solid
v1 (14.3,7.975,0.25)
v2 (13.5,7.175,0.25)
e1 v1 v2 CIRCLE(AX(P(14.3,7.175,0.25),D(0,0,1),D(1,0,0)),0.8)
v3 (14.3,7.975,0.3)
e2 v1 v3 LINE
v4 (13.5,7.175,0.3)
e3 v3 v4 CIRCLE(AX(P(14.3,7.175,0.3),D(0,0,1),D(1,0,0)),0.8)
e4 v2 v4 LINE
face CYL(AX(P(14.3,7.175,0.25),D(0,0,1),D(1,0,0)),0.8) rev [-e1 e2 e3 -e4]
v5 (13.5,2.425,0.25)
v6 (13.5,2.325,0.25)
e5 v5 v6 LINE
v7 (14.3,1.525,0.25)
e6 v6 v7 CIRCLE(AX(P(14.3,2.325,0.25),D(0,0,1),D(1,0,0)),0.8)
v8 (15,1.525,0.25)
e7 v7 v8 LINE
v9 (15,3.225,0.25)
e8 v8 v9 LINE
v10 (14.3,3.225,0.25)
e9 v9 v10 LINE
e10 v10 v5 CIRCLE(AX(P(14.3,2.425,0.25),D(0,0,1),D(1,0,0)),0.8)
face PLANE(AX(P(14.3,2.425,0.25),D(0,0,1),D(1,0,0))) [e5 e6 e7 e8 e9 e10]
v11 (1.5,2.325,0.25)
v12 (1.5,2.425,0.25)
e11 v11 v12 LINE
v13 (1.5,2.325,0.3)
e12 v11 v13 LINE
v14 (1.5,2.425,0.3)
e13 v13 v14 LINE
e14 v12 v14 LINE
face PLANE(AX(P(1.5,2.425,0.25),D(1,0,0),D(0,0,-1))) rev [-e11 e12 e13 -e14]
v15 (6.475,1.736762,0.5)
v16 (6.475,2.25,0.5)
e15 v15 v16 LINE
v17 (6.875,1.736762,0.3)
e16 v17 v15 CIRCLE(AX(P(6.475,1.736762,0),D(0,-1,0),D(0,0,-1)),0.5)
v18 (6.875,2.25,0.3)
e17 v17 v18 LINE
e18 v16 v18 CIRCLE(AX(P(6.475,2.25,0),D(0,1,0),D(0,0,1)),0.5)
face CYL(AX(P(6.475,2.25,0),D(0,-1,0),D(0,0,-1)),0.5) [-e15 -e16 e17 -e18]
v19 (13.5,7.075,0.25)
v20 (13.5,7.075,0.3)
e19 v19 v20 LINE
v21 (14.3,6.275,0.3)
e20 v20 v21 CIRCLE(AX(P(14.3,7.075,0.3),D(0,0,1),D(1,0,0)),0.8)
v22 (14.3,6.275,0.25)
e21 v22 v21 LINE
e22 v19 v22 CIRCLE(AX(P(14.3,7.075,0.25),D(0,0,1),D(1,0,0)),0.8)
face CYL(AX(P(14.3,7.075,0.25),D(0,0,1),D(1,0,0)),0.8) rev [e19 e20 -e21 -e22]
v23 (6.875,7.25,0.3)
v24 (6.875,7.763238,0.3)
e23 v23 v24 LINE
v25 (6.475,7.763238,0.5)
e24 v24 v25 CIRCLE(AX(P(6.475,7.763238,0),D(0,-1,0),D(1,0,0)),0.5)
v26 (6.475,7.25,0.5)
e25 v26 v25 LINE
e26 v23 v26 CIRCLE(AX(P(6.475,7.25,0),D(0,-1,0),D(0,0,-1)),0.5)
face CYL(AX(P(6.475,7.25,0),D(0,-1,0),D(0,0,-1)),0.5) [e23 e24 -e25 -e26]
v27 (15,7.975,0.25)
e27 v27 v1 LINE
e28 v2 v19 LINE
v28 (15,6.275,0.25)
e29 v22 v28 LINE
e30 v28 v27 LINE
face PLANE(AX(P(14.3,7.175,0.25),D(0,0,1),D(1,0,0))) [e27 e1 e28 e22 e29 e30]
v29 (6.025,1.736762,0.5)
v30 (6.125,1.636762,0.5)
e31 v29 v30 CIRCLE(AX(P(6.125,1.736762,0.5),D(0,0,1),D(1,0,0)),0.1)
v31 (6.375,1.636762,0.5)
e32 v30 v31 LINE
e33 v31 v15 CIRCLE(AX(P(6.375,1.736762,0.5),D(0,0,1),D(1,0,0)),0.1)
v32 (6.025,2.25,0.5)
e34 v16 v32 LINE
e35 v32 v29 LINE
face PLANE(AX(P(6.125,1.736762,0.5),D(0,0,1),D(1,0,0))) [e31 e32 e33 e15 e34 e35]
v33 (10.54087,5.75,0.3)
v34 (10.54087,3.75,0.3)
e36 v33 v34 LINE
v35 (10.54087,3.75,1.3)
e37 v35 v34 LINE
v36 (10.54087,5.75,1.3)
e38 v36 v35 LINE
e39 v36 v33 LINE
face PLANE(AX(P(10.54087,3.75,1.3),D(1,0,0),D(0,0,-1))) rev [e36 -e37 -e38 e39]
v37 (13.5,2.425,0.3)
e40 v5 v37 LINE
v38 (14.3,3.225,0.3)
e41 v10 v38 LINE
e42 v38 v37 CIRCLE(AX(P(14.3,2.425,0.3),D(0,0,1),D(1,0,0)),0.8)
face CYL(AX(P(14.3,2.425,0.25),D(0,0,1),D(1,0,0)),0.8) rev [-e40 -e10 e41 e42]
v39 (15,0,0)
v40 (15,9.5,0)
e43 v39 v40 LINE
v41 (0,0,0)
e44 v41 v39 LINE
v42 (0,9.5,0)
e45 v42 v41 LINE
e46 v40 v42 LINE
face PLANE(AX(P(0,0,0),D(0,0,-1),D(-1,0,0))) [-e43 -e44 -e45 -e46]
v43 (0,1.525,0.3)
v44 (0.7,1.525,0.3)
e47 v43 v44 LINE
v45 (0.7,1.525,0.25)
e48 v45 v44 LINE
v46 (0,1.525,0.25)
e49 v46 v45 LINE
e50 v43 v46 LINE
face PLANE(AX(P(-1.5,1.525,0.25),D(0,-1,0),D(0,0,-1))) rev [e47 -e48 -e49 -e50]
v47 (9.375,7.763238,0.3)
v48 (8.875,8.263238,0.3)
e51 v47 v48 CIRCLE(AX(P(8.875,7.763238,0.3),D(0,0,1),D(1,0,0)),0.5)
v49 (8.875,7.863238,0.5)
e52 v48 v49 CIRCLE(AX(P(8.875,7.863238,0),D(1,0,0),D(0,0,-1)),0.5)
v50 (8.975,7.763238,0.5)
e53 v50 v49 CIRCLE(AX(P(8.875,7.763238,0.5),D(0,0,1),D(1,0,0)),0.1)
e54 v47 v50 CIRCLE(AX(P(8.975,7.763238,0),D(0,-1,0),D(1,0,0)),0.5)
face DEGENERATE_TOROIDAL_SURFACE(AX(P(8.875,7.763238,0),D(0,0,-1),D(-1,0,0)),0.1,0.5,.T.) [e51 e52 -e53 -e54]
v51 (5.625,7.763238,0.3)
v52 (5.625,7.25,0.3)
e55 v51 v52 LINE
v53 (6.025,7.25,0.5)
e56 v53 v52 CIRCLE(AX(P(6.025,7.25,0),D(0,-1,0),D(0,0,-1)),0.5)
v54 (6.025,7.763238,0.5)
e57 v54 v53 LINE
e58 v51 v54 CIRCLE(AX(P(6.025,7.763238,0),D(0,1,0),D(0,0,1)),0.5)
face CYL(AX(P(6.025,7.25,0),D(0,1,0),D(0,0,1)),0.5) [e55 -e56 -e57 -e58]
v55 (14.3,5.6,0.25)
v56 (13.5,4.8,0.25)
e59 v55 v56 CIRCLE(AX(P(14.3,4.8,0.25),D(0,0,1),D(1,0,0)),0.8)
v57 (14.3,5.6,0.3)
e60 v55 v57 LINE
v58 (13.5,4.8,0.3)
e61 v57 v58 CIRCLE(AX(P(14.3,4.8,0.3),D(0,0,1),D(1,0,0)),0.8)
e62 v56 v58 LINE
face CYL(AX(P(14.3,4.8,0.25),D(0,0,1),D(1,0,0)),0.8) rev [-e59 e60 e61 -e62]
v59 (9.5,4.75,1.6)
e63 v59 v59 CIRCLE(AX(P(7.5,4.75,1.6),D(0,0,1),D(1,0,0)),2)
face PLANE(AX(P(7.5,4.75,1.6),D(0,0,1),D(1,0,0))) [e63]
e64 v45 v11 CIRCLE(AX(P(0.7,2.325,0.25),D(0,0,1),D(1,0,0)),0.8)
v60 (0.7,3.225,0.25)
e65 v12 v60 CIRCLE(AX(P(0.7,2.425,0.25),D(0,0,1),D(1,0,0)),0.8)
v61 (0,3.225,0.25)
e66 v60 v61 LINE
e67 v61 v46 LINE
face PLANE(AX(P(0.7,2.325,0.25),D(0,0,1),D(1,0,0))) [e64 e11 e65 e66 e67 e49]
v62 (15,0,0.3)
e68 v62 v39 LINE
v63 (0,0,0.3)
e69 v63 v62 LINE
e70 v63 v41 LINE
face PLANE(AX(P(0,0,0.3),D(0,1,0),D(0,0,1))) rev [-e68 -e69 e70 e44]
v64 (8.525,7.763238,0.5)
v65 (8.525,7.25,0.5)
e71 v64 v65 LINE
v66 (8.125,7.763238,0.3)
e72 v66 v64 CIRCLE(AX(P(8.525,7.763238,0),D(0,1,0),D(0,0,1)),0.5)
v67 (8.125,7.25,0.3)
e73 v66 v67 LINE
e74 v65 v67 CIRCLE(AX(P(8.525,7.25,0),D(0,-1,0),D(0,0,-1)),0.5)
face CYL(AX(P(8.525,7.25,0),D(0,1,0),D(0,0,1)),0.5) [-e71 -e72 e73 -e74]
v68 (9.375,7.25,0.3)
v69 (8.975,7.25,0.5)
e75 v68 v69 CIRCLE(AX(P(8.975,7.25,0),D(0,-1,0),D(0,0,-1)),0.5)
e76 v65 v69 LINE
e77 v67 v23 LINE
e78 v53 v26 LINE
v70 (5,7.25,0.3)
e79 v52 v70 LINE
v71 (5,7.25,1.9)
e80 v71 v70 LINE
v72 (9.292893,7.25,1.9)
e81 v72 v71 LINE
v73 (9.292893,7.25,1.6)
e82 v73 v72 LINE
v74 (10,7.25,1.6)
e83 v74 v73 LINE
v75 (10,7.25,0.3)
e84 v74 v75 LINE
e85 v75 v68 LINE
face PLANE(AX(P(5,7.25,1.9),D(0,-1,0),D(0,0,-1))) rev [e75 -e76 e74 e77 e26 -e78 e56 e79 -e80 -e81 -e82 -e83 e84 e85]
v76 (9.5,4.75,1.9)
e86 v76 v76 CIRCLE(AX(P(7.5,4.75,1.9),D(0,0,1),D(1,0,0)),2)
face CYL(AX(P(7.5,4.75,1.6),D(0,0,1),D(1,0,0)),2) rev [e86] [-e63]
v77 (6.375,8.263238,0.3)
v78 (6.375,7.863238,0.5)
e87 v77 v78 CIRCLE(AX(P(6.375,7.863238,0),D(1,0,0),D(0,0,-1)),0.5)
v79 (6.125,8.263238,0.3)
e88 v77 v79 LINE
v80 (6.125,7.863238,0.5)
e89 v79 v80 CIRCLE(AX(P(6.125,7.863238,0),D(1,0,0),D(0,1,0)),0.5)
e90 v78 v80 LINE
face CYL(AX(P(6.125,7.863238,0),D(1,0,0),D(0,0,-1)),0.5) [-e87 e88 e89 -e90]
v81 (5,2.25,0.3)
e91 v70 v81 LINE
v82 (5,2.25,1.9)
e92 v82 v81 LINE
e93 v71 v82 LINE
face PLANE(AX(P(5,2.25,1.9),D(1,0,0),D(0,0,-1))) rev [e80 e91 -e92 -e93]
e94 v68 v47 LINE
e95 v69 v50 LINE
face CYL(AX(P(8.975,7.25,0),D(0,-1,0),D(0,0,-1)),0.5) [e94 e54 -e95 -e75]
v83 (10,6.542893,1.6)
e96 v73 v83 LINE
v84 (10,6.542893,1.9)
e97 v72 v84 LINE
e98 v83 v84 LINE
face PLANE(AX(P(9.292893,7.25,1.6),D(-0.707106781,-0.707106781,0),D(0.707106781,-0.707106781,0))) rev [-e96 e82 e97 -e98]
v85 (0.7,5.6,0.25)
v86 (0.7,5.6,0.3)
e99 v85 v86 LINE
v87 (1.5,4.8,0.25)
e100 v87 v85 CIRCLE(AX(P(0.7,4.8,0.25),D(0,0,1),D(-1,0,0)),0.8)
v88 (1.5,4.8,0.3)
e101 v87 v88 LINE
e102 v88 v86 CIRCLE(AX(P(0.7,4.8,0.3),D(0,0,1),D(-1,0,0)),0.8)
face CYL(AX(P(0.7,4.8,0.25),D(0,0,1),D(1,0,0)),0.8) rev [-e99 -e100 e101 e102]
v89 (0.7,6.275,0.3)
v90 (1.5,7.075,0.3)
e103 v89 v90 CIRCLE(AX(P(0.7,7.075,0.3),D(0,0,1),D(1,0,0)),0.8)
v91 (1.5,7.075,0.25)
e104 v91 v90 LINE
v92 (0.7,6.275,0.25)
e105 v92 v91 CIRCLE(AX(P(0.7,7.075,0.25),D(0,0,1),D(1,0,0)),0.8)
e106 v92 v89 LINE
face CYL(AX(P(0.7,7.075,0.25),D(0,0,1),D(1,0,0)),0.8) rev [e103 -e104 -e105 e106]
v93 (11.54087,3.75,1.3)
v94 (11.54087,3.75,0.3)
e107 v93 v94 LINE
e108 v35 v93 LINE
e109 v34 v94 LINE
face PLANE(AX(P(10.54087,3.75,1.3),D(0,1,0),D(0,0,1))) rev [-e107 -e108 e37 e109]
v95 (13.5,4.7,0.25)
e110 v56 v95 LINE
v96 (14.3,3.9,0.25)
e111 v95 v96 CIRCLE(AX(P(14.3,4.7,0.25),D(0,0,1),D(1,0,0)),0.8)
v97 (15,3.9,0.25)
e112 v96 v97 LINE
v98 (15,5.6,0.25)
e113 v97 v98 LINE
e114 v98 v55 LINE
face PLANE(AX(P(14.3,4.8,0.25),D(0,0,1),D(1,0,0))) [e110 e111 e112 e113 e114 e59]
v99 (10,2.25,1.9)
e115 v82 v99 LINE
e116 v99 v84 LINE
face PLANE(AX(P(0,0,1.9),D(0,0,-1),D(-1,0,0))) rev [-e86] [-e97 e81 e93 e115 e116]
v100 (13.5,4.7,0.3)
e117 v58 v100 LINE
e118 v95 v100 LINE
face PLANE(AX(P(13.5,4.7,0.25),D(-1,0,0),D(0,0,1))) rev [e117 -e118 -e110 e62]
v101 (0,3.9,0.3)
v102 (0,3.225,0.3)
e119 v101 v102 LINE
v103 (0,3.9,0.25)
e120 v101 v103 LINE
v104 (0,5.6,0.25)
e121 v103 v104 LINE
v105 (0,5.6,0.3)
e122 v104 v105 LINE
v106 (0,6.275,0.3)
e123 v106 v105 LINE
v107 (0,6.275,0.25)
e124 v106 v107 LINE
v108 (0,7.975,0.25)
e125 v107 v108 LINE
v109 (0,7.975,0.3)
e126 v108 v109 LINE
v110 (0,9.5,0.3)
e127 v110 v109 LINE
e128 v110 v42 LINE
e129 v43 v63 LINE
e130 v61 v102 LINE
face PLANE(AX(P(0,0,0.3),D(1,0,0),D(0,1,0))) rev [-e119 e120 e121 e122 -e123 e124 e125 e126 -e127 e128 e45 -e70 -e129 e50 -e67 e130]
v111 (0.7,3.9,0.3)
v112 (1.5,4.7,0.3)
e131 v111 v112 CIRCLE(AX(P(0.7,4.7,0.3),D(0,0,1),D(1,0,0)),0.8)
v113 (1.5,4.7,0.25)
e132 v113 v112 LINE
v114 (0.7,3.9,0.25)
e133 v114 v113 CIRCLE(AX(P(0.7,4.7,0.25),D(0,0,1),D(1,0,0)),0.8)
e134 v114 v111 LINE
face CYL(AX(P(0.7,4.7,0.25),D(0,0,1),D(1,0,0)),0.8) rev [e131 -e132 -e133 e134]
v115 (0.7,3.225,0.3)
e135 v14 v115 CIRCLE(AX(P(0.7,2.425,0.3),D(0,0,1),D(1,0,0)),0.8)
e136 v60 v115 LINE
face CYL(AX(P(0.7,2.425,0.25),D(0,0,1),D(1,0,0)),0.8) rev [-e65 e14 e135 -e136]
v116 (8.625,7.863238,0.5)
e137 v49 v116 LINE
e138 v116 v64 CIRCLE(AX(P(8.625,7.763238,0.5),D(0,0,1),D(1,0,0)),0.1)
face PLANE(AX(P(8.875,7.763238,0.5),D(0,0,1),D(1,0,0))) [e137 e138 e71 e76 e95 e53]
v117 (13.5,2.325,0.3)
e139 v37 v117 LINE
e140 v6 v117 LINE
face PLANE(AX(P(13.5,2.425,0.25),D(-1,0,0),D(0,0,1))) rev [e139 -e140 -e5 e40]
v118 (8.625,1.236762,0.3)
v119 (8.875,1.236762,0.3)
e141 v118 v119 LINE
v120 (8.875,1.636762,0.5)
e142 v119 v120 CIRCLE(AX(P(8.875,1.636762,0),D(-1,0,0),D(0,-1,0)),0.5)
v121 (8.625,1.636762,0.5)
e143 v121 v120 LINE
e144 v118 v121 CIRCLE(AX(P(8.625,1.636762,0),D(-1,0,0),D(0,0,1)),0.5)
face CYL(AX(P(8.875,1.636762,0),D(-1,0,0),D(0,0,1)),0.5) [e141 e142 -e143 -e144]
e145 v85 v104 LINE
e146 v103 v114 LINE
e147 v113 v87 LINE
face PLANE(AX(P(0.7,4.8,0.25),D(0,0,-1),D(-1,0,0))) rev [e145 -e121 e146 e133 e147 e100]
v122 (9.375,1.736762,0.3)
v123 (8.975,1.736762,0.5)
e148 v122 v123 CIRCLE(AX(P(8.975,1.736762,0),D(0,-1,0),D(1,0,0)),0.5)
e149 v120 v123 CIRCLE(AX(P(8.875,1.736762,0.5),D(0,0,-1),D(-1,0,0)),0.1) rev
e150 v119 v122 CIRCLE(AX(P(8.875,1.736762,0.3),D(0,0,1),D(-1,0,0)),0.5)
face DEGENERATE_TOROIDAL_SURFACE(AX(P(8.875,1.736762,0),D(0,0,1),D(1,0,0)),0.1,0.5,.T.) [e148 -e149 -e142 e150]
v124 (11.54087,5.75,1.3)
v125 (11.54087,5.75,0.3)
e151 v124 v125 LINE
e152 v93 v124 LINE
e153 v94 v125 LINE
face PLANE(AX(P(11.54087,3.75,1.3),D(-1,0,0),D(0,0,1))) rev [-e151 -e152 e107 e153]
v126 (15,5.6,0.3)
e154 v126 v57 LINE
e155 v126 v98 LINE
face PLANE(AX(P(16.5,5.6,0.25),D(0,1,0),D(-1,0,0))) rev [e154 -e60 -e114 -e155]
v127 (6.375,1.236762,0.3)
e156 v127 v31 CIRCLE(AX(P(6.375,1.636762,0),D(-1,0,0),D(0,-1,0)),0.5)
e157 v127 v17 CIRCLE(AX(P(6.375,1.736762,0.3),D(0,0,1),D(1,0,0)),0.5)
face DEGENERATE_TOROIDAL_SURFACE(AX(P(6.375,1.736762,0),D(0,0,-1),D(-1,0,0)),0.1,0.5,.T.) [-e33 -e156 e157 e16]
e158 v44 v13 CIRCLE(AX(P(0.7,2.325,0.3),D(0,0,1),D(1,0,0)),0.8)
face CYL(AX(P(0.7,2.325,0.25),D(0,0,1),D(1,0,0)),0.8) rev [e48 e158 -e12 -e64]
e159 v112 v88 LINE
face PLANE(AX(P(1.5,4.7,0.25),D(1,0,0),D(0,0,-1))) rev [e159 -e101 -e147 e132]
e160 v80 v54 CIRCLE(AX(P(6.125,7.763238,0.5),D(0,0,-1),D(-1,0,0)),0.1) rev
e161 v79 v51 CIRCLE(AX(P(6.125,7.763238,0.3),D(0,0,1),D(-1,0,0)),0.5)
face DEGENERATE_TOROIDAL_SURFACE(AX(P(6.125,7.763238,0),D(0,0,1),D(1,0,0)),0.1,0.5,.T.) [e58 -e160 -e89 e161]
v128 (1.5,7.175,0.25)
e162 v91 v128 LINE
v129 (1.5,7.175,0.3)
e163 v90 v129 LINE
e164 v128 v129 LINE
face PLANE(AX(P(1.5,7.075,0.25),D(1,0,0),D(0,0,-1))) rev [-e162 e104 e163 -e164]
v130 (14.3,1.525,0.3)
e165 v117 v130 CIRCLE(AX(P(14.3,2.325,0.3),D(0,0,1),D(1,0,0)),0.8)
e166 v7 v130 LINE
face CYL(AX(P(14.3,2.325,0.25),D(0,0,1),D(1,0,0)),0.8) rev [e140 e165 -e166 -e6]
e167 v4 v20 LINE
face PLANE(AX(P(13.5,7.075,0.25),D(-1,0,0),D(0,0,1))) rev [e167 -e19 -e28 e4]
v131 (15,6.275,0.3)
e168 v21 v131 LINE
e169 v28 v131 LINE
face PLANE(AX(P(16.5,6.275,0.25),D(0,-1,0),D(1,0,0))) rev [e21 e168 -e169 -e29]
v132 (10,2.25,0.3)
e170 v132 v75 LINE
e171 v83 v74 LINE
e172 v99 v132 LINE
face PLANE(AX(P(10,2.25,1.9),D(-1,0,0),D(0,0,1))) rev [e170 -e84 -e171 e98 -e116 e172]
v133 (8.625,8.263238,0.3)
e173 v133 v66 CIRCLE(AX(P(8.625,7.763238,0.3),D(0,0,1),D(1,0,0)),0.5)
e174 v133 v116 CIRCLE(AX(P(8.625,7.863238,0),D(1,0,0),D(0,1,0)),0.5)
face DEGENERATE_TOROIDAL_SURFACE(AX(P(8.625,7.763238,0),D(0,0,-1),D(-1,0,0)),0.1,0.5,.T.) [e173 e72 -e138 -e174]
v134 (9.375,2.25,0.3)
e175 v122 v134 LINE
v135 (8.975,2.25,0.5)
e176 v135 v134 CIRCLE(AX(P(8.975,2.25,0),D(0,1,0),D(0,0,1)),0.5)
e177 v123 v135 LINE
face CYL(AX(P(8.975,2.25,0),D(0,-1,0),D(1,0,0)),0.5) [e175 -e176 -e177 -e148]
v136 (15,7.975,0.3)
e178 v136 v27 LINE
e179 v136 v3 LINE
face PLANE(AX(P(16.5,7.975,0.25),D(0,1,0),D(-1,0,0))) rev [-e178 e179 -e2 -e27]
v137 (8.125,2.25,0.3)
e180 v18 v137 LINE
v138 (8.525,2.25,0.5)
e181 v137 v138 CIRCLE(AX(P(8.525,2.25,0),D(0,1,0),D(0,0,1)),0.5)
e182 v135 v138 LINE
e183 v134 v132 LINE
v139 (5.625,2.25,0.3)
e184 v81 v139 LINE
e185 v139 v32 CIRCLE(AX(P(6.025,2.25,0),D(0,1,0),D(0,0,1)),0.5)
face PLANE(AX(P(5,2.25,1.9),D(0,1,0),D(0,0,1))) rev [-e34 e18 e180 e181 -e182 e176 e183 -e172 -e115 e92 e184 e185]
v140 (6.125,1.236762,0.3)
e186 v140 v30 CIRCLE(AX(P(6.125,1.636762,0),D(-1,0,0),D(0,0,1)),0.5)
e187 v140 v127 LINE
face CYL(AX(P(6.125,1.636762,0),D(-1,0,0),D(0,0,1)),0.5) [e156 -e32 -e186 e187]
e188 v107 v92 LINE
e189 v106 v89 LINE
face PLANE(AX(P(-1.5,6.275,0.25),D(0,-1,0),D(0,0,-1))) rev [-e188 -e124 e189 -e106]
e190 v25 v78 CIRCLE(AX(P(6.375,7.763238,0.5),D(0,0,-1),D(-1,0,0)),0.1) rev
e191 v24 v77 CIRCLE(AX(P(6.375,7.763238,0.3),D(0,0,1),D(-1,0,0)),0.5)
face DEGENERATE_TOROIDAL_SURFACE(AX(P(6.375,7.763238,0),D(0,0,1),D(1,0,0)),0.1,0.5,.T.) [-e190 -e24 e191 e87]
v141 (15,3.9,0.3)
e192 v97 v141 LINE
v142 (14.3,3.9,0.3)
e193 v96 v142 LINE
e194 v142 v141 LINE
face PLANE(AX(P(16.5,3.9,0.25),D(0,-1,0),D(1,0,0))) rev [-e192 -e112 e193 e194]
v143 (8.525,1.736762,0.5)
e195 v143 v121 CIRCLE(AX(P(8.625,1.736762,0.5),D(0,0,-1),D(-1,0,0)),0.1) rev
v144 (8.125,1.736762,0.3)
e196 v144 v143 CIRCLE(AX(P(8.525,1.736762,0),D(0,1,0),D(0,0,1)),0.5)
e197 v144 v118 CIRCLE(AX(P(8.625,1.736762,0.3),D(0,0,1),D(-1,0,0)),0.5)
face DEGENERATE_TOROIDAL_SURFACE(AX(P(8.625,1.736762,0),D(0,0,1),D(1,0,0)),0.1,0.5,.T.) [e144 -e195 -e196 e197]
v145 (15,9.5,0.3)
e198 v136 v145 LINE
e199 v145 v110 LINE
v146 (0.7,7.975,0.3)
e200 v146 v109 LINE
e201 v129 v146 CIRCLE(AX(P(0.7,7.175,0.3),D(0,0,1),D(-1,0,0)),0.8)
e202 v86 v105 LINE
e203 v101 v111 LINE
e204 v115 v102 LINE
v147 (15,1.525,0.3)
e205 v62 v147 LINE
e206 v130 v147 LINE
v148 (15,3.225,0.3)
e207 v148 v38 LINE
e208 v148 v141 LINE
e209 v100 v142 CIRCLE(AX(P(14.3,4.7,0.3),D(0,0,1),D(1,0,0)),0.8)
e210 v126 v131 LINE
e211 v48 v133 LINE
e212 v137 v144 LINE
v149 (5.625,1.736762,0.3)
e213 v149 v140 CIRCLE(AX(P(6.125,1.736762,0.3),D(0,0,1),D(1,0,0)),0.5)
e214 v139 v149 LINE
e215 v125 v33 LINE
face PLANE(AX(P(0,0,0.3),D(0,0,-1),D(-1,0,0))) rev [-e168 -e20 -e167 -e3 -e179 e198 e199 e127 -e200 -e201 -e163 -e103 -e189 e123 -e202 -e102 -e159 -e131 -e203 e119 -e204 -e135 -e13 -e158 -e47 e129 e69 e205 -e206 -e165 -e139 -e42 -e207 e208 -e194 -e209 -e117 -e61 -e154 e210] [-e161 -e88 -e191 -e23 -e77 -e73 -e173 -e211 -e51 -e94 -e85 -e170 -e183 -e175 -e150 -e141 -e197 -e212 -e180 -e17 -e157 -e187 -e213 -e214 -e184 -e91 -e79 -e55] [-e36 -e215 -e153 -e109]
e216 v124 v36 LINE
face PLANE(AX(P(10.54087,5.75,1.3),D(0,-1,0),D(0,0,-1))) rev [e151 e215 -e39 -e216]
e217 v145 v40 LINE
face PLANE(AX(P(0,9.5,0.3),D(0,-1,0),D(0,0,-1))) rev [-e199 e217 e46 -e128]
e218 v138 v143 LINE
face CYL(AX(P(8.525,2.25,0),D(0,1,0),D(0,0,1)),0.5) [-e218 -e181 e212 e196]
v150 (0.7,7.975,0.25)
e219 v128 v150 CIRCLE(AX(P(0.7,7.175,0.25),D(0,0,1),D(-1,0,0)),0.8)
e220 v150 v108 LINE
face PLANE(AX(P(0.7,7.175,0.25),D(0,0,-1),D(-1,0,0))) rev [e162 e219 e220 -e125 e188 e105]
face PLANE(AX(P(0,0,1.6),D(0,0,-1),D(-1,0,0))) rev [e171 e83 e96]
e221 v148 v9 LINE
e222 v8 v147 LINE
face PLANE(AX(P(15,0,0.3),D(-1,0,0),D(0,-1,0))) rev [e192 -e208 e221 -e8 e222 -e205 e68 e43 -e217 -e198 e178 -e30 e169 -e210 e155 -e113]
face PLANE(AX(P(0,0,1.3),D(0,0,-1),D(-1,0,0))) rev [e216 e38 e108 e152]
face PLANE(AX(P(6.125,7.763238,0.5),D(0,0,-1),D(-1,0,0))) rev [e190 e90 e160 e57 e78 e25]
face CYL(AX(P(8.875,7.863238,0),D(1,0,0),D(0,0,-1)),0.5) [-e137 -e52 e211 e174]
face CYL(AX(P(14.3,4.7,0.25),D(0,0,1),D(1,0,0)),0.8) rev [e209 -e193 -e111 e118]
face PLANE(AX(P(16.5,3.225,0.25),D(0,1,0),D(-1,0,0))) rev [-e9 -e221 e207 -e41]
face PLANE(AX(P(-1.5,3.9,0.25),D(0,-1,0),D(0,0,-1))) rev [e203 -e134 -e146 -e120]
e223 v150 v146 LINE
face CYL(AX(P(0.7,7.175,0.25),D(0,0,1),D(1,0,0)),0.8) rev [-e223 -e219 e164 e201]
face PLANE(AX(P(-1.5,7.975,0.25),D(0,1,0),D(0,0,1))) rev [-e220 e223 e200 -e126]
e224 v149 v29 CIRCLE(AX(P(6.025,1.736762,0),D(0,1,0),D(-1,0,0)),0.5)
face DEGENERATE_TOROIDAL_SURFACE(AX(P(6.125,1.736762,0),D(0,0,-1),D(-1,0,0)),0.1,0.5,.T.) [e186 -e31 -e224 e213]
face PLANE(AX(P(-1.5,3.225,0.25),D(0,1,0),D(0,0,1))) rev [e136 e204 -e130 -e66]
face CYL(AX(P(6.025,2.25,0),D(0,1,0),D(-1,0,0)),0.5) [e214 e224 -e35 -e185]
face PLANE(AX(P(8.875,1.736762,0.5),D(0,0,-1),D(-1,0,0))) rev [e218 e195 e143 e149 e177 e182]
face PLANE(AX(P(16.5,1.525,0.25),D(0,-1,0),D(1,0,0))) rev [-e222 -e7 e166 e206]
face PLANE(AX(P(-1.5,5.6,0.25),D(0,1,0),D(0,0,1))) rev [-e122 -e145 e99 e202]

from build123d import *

# Parameters (mm, degrees)
ESQUISSE1_W             = 15
ESQUISSE1_H             = 9.5
BOSS_EXTRU_1_DEPTH      = 0.3
ESQUISSE2_W             = 5
ESQUISSE2_H             = 5
BOSS_EXTRU_2_DEPTH      = 1.6
ESQUISSE3_R             = 2
ENL_V_MAT_EXTRU_1_DEPTH = 0.3
BOSS_EXTRU_3_DEPTH      = 0.2
CONG_1_R                = 0.5
ENL_V_MAT_EXTRU_2_DEPTH = 0.05
ESQUISSE6_W             = 1
ESQUISSE6_H             = 2
BOSS_EXTRU_4_DEPTH      = 1


with BuildPart() as part:
    # Esquisse1 → Boss.-Extru.1 (new body)
    with BuildSketch(Plane.XY):
        with Locations((7.5, 4.75)):
            Rectangle(ESQUISSE1_W, ESQUISSE1_H)
    extrude(amount=BOSS_EXTRU_1_DEPTH)

    # Esquisse2 → Boss.-Extru.2 (add)
    with BuildSketch(Plane.XY.offset(0.3)):
        with Locations((7.5, 4.75)):
            Rectangle(ESQUISSE2_W, ESQUISSE2_H)
    extrude(amount=BOSS_EXTRU_2_DEPTH)

    # Esquisse3 → Enlèv. mat.-Extru.1 (cut)
    with BuildSketch(Plane.XY.offset(1.9)):
        with Locations((7.5, 4.75)):
            Circle(ESQUISSE3_R)
        Polygon((9.292893219, 7.25), (10, 6.542893219), (10, 7.25), align=None)
    extrude(amount=-ENL_V_MAT_EXTRU_1_DEPTH, mode=Mode.SUBTRACT)

    # Esquisse4 → Boss.-Extru.3 (add)
    with BuildSketch(Plane.XY.offset(0.3)):
        with BuildLine():
            Line((8.875, 8.263238259), (8.625, 8.263238259))
            ThreePointArc((8.625, 8.263238259), (8.271446609, 8.11679165), (8.125, 7.763238259))
            Line((8.125, 7.763238259), (8.125, 7.25))
            Line((8.125, 7.25), (9.375, 7.25))
            Line((9.375, 7.25), (9.375, 7.763238259))
            ThreePointArc((9.375, 7.763238259), (9.228553391, 8.11679165), (8.875, 8.263238259))
        make_face()
        with BuildLine():
            Line((5.625, 7.25), (6.875, 7.25))
            Line((6.875, 7.25), (6.875, 7.763238259))
            ThreePointArc((6.875, 7.763238259), (6.728553391, 8.11679165), (6.375, 8.263238259))
            Line((6.375, 8.263238259), (6.125, 8.263238259))
            ThreePointArc((6.125, 8.263238259), (5.771446609, 8.11679165), (5.625, 7.763238259))
            Line((5.625, 7.763238259), (5.625, 7.25))
        make_face()
        with BuildLine():
            Line((9.375, 2.25), (9.375, 1.736761741))
            ThreePointArc((9.375, 1.736761741), (9.228553391, 1.38320835), (8.875, 1.236761741))
            Line((8.875, 1.236761741), (8.625, 1.236761741))
            ThreePointArc((8.625, 1.236761741), (8.271446609, 1.38320835), (8.125, 1.736761741))
            Line((8.125, 1.736761741), (8.125, 2.25))
            Line((8.125, 2.25), (9.375, 2.25))
        make_face()
        with BuildLine():
            Line((6.125, 1.236761741), (6.375, 1.236761741))
            ThreePointArc((6.375, 1.236761741), (6.728553391, 1.38320835), (6.875, 1.736761741))
            Line((6.875, 1.736761741), (6.875, 2.25))
            Line((6.875, 2.25), (5.625, 2.25))
            Line((5.625, 2.25), (5.625, 1.736761741))
            ThreePointArc((5.625, 1.736761741), (5.771446609, 1.38320835), (6.125, 1.236761741))
        make_face()
    extrude(amount=BOSS_EXTRU_3_DEPTH)

    # Congé1
    # the kernel refuses this fillet: 0.5 mm, written as the material it takes off along each edge
    with BuildSketch(Plane(origin=(8.125, 1.736761741, 0.5), x_dir=(2.6165736243852198e-11, 0, -1.0), z_dir=(0, 1, 0)), Plane(origin=(9.375, 2.25, 0.5), x_dir=(-2.6165736243852198e-11, 0, -1.0), z_dir=(0, -1, 0))) as cong_1_piece_1:
        with BuildLine():
            CenterArc((0.5, -0.4), CONG_1_R, 126.869897647, 53.130102355)
            Line((0, -0.4), (-0.01, -0.4))
            Line((-0.01, -0.4), (-0.01, 0))
            Line((-0.01, 0), (0, 0.01))
            ThreePointArc((0, 0.01), (0.1, 0.01), (0.194, 0.008))
            Line((0.194, 0.008), (0.2, 0))
        make_face()
    extrude(amount=0.513238259, mode=Mode.SUBTRACT)
    with BuildSketch(Plane(origin=(8.625, 1.736761741, 0.5), x_dir=(0, -1, 0), z_dir=(1, 0, 0))) as cong_1_piece_2:
        with BuildLine():
            CenterArc((0.1, 0.5), CONG_1_R, 270, 53.130102355)
            Line((0.1, 0), (0.1, -0.01))
            Line((0.1, -0.01), (0.5, -0.01))
            Line((0.5, -0.01), (0.51, 0))
            ThreePointArc((0.51, 0), (0.51, 0.1), (0.508, 0.194))
            Line((0.508, 0.194), (0.5, 0.2))
        make_face()
    revolve(axis=Axis((8.625, 1.736761741, 0.5), (0, 0, -1)), revolution_arc=90, mode=Mode.SUBTRACT)
    with BuildSketch(Plane(origin=(8.875, 1.236761741, 0.5), x_dir=(0, 2.6109114869598534e-11, -1.0), z_dir=(-1, 0, 0))) as cong_1_piece_3:
        with BuildLine():
            CenterArc((0.5, -0.4), CONG_1_R, 126.869897647, 53.130102355)
            Line((0, -0.4), (-0.01, -0.4))
            Line((-0.01, -0.4), (-0.01, 0))
            Line((-0.01, 0), (0, 0.01))
            ThreePointArc((0, 0.01), (0.1, 0.01), (0.194, 0.008))
            Line((0.194, 0.008), (0.2, 0))
        make_face()
    extrude(amount=0.25, mode=Mode.SUBTRACT)
    with BuildSketch(Plane(origin=(5.625, 2.25, 0.5), x_dir=(2.6059154833492393e-11, 0, -1.0), z_dir=(0, -1, 0)), Plane(origin=(6.875, 1.736761741, 0.5), x_dir=(-2.6112445538672294e-11, 0, -1.0), z_dir=(0, 1, 0)), Plane(origin=(6.875, 7.25, 0.5), x_dir=(-2.6112445538672294e-11, 0, -1.0), z_dir=(0, 1, 0)), Plane(origin=(5.625, 7.763238259, 0.5), x_dir=(2.6059154833492393e-11, 0, -1.0), z_dir=(0, -1, 0)), Plane(origin=(9.375, 7.25, 0.5), x_dir=(-2.6165736243852198e-11, 0, -1.0), z_dir=(0, 1, 0)), Plane(origin=(8.125, 7.763238259, 0.5), x_dir=(2.6165736243852198e-11, 0, -1.0), z_dir=(0, -1, 0))) as cong_1_piece_4:
        with BuildLine():
            CenterArc((0.5, 0.4), CONG_1_R, 179.999999999, 53.130102355)
            Line((0, 0.4), (-0.01, 0.4))
            Line((-0.01, 0.4), (-0.01, 0))
            Line((-0.01, 0), (0, -0.01))
            ThreePointArc((0, -0.01), (0.1, -0.01), (0.194, -0.008))
            Line((0.194, -0.008), (0.2, 0))
        make_face()
    extrude(amount=0.513238259, mode=Mode.SUBTRACT)
    with BuildSketch(Plane(origin=(6.125, 1.736761741, 0.5), x_dir=(-1, 0, 0), z_dir=(0, 1, 0))) as cong_1_piece_5:
        with BuildLine():
            CenterArc((0.1, -0.5), CONG_1_R, 36.869897645, 53.130102355)
            Line((0.1, 0), (0.1, 0.01))
            Line((0.1, 0.01), (0.5, 0.01))
            Line((0.5, 0.01), (0.51, 0))
            ThreePointArc((0.51, 0), (0.51, -0.1), (0.508, -0.194))
            Line((0.508, -0.194), (0.5, -0.2))
        make_face()
    revolve(axis=Axis((6.125, 1.736761741, 0.5), (0, 0, 1)), revolution_arc=90, mode=Mode.SUBTRACT)
    with BuildSketch(Plane(origin=(6.125, 1.236761741, 0.5), x_dir=(0, 2.6109114869598534e-11, -1.0), z_dir=(1, 0, 0)), Plane(origin=(6.375, 8.263238259, 0.5), x_dir=(0, -2.6112445538672342e-11, -1.0), z_dir=(-1, 0, 0)), Plane(origin=(8.875, 8.263238259, 0.5), x_dir=(0, -2.6112445538672342e-11, -1.0), z_dir=(-1, 0, 0))) as cong_1_piece_6:
        with BuildLine():
            CenterArc((0.5, 0.4), CONG_1_R, 179.999999999, 53.130102355)
            Line((0, 0.4), (-0.01, 0.4))
            Line((-0.01, 0.4), (-0.01, 0))
            Line((-0.01, 0), (0, -0.01))
            ThreePointArc((0, -0.01), (0.1, -0.01), (0.194, -0.008))
            Line((0.194, -0.008), (0.2, 0))
        make_face()
    extrude(amount=0.25, mode=Mode.SUBTRACT)
    with BuildSketch(Plane(origin=(6.125, 7.763238259, 0.5), x_dir=(0, 1, 0), z_dir=(1, 0, 0))) as cong_1_piece_7:
        with BuildLine():
            CenterArc((0.1, -0.5), CONG_1_R, 36.869897645, 53.130102355)
            Line((0.1, 0), (0.1, 0.01))
            Line((0.1, 0.01), (0.5, 0.01))
            Line((0.5, 0.01), (0.51, 0))
            ThreePointArc((0.51, 0), (0.51, -0.1), (0.508, -0.194))
            Line((0.508, -0.194), (0.5, -0.2))
        make_face()
    revolve(axis=Axis((6.125, 7.763238259, 0.5), (0, 0, 1)), revolution_arc=90, mode=Mode.SUBTRACT)
    with BuildSketch(Plane(origin=(8.875, 7.763238259, 0.5), x_dir=(1, 0, 0), z_dir=(0, -1, 0))) as cong_1_piece_8:
        with BuildLine():
            CenterArc((0.1, -0.5), CONG_1_R, 36.869897645, 53.130102355)
            Line((0.1, 0), (0.1, 0.01))
            Line((0.1, 0.01), (0.5, 0.01))
            Line((0.5, 0.01), (0.51, 0))
            ThreePointArc((0.51, 0), (0.51, -0.1), (0.508, -0.194))
            Line((0.508, -0.194), (0.5, -0.2))
        make_face()
    revolve(axis=Axis((8.875, 7.763238259, 0.5), (0, 0, 1)), revolution_arc=90, mode=Mode.SUBTRACT)
    with BuildSketch(Plane(origin=(8.875, 1.736761741, 0.5), x_dir=(1, 0, 0), z_dir=(0, 1, 0))) as cong_1_piece_9:
        with BuildLine():
            CenterArc((0.1, 0.5), CONG_1_R, 270, 53.130102355)
            Line((0.1, 0), (0.1, -0.01))
            Line((0.1, -0.01), (0.5, -0.01))
            Line((0.5, -0.01), (0.51, 0))
            ThreePointArc((0.51, 0), (0.51, 0.1), (0.508, 0.194))
            Line((0.508, 0.194), (0.5, 0.2))
        make_face()
    revolve(axis=Axis((8.875, 1.736761741, 0.5), (0, 0, -1)), revolution_arc=90, mode=Mode.SUBTRACT)
    with BuildSketch(Plane(origin=(6.375, 1.736761741, 0.5), x_dir=(0, -1, 0), z_dir=(-1, 0, 0))) as cong_1_piece_10:
        with BuildLine():
            CenterArc((0.1, -0.5), CONG_1_R, 36.869897645, 53.130102355)
            Line((0.1, 0), (0.1, 0.01))
            Line((0.1, 0.01), (0.5, 0.01))
            Line((0.5, 0.01), (0.51, 0))
            ThreePointArc((0.51, 0), (0.51, -0.1), (0.508, -0.194))
            Line((0.508, -0.194), (0.5, -0.2))
        make_face()
    revolve(axis=Axis((6.375, 1.736761741, 0.5), (0, 0, 1)), revolution_arc=90, mode=Mode.SUBTRACT)
    with BuildSketch(Plane(origin=(6.375, 7.763238259, 0.5), x_dir=(1, 0, 0), z_dir=(0, -1, 0))) as cong_1_piece_11:
        with BuildLine():
            CenterArc((0.1, -0.5), CONG_1_R, 36.869897645, 53.130102355)
            Line((0.1, 0), (0.1, 0.01))
            Line((0.1, 0.01), (0.5, 0.01))
            Line((0.5, 0.01), (0.51, 0))
            ThreePointArc((0.51, 0), (0.51, -0.1), (0.508, -0.194))
            Line((0.508, -0.194), (0.5, -0.2))
        make_face()
    revolve(axis=Axis((6.375, 7.763238259, 0.5), (0, 0, 1)), revolution_arc=90, mode=Mode.SUBTRACT)
    with BuildSketch(Plane(origin=(8.625, 7.763238259, 0.5), x_dir=(0, 1, 0), z_dir=(1, 0, 0))) as cong_1_piece_12:
        with BuildLine():
            CenterArc((0.1, -0.5), CONG_1_R, 36.869897645, 53.130102355)
            Line((0.1, 0), (0.1, 0.01))
            Line((0.1, 0.01), (0.5, 0.01))
            Line((0.5, 0.01), (0.51, 0))
            ThreePointArc((0.51, 0), (0.51, -0.1), (0.508, -0.194))
            Line((0.508, -0.194), (0.5, -0.2))
        make_face()
    revolve(axis=Axis((8.625, 7.763238259, 0.5), (0, 0, 1)), revolution_arc=90, mode=Mode.SUBTRACT)

    # Esquisse5 → Enlèv. mat.-Extru.2 (cut)
    with BuildSketch(Plane.XY.offset(0.3)):
        with BuildLine():
            Line((-1.5, 1.525), (0.7, 1.525))
            ThreePointArc((0.7, 1.525), (1.265685425, 1.759314575), (1.5, 2.325))
            Line((1.5, 2.325), (1.5, 2.425))
            ThreePointArc((1.5, 2.425), (1.265685425, 2.990685425), (0.7, 3.225))
            Line((0.7, 3.225), (-1.5, 3.225))
            Line((-1.5, 3.225), (-1.5, 1.525))
        make_face()
        with BuildLine():
            Line((-1.5, 3.9), (0.7, 3.9))
            ThreePointArc((0.7, 3.9), (1.265685425, 4.134314575), (1.5, 4.7))
            Line((1.5, 4.7), (1.5, 4.8))
            ThreePointArc((1.5, 4.8), (1.265685425, 5.365685425), (0.7, 5.6))
            Line((0.7, 5.6), (-1.5, 5.6))
            Line((-1.5, 5.6), (-1.5, 3.9))
        make_face()
        with BuildLine():
            Line((-1.5, 6.275), (0.7, 6.275))
            ThreePointArc((0.7, 6.275), (1.265685425, 6.509314575), (1.5, 7.075))
            Line((1.5, 7.075), (1.5, 7.175))
            ThreePointArc((1.5, 7.175), (1.265685425, 7.740685425), (0.7, 7.975))
            Line((0.7, 7.975), (-1.5, 7.975))
            Line((-1.5, 7.975), (-1.5, 6.275))
        make_face()
        with BuildLine():
            Line((16.5, 3.225), (16.5, 1.525))
            Line((16.5, 1.525), (14.3, 1.525))
            ThreePointArc((14.3, 1.525), (13.734314575, 1.759314575), (13.5, 2.325))
            Line((13.5, 2.325), (13.5, 2.425))
            ThreePointArc((13.5, 2.425), (13.734314575, 2.990685425), (14.3, 3.225))
            Line((14.3, 3.225), (16.5, 3.225))
        make_face()
        with BuildLine():
            Line((16.5, 5.6), (14.3, 5.6))
            ThreePointArc((14.3, 5.6), (13.734314575, 5.365685425), (13.5, 4.8))
            Line((13.5, 4.8), (13.5, 4.7))
            ThreePointArc((13.5, 4.7), (13.734314575, 4.134314575), (14.3, 3.9))
            Line((14.3, 3.9), (16.5, 3.9))
            Line((16.5, 3.9), (16.5, 5.6))
        make_face()
        with BuildLine():
            Line((16.5, 7.975), (14.3, 7.975))
            ThreePointArc((14.3, 7.975), (13.734314575, 7.740685425), (13.5, 7.175))
            Line((13.5, 7.175), (13.5, 7.075))
            ThreePointArc((13.5, 7.075), (13.734314575, 6.509314575), (14.3, 6.275))
            Line((14.3, 6.275), (16.5, 6.275))
            Line((16.5, 6.275), (16.5, 7.975))
        make_face()
    extrude(amount=-ENL_V_MAT_EXTRU_2_DEPTH, mode=Mode.SUBTRACT)

    # Esquisse6 → Boss.-Extru.4 (add)
    with BuildSketch(Plane.XY.offset(0.3)):
        with Locations((11.04087009, 4.75)):
            Rectangle(ESQUISSE6_W, ESQUISSE6_H)
    extrude(amount=BOSS_EXTRU_4_DEPTH)


solid = part.part
